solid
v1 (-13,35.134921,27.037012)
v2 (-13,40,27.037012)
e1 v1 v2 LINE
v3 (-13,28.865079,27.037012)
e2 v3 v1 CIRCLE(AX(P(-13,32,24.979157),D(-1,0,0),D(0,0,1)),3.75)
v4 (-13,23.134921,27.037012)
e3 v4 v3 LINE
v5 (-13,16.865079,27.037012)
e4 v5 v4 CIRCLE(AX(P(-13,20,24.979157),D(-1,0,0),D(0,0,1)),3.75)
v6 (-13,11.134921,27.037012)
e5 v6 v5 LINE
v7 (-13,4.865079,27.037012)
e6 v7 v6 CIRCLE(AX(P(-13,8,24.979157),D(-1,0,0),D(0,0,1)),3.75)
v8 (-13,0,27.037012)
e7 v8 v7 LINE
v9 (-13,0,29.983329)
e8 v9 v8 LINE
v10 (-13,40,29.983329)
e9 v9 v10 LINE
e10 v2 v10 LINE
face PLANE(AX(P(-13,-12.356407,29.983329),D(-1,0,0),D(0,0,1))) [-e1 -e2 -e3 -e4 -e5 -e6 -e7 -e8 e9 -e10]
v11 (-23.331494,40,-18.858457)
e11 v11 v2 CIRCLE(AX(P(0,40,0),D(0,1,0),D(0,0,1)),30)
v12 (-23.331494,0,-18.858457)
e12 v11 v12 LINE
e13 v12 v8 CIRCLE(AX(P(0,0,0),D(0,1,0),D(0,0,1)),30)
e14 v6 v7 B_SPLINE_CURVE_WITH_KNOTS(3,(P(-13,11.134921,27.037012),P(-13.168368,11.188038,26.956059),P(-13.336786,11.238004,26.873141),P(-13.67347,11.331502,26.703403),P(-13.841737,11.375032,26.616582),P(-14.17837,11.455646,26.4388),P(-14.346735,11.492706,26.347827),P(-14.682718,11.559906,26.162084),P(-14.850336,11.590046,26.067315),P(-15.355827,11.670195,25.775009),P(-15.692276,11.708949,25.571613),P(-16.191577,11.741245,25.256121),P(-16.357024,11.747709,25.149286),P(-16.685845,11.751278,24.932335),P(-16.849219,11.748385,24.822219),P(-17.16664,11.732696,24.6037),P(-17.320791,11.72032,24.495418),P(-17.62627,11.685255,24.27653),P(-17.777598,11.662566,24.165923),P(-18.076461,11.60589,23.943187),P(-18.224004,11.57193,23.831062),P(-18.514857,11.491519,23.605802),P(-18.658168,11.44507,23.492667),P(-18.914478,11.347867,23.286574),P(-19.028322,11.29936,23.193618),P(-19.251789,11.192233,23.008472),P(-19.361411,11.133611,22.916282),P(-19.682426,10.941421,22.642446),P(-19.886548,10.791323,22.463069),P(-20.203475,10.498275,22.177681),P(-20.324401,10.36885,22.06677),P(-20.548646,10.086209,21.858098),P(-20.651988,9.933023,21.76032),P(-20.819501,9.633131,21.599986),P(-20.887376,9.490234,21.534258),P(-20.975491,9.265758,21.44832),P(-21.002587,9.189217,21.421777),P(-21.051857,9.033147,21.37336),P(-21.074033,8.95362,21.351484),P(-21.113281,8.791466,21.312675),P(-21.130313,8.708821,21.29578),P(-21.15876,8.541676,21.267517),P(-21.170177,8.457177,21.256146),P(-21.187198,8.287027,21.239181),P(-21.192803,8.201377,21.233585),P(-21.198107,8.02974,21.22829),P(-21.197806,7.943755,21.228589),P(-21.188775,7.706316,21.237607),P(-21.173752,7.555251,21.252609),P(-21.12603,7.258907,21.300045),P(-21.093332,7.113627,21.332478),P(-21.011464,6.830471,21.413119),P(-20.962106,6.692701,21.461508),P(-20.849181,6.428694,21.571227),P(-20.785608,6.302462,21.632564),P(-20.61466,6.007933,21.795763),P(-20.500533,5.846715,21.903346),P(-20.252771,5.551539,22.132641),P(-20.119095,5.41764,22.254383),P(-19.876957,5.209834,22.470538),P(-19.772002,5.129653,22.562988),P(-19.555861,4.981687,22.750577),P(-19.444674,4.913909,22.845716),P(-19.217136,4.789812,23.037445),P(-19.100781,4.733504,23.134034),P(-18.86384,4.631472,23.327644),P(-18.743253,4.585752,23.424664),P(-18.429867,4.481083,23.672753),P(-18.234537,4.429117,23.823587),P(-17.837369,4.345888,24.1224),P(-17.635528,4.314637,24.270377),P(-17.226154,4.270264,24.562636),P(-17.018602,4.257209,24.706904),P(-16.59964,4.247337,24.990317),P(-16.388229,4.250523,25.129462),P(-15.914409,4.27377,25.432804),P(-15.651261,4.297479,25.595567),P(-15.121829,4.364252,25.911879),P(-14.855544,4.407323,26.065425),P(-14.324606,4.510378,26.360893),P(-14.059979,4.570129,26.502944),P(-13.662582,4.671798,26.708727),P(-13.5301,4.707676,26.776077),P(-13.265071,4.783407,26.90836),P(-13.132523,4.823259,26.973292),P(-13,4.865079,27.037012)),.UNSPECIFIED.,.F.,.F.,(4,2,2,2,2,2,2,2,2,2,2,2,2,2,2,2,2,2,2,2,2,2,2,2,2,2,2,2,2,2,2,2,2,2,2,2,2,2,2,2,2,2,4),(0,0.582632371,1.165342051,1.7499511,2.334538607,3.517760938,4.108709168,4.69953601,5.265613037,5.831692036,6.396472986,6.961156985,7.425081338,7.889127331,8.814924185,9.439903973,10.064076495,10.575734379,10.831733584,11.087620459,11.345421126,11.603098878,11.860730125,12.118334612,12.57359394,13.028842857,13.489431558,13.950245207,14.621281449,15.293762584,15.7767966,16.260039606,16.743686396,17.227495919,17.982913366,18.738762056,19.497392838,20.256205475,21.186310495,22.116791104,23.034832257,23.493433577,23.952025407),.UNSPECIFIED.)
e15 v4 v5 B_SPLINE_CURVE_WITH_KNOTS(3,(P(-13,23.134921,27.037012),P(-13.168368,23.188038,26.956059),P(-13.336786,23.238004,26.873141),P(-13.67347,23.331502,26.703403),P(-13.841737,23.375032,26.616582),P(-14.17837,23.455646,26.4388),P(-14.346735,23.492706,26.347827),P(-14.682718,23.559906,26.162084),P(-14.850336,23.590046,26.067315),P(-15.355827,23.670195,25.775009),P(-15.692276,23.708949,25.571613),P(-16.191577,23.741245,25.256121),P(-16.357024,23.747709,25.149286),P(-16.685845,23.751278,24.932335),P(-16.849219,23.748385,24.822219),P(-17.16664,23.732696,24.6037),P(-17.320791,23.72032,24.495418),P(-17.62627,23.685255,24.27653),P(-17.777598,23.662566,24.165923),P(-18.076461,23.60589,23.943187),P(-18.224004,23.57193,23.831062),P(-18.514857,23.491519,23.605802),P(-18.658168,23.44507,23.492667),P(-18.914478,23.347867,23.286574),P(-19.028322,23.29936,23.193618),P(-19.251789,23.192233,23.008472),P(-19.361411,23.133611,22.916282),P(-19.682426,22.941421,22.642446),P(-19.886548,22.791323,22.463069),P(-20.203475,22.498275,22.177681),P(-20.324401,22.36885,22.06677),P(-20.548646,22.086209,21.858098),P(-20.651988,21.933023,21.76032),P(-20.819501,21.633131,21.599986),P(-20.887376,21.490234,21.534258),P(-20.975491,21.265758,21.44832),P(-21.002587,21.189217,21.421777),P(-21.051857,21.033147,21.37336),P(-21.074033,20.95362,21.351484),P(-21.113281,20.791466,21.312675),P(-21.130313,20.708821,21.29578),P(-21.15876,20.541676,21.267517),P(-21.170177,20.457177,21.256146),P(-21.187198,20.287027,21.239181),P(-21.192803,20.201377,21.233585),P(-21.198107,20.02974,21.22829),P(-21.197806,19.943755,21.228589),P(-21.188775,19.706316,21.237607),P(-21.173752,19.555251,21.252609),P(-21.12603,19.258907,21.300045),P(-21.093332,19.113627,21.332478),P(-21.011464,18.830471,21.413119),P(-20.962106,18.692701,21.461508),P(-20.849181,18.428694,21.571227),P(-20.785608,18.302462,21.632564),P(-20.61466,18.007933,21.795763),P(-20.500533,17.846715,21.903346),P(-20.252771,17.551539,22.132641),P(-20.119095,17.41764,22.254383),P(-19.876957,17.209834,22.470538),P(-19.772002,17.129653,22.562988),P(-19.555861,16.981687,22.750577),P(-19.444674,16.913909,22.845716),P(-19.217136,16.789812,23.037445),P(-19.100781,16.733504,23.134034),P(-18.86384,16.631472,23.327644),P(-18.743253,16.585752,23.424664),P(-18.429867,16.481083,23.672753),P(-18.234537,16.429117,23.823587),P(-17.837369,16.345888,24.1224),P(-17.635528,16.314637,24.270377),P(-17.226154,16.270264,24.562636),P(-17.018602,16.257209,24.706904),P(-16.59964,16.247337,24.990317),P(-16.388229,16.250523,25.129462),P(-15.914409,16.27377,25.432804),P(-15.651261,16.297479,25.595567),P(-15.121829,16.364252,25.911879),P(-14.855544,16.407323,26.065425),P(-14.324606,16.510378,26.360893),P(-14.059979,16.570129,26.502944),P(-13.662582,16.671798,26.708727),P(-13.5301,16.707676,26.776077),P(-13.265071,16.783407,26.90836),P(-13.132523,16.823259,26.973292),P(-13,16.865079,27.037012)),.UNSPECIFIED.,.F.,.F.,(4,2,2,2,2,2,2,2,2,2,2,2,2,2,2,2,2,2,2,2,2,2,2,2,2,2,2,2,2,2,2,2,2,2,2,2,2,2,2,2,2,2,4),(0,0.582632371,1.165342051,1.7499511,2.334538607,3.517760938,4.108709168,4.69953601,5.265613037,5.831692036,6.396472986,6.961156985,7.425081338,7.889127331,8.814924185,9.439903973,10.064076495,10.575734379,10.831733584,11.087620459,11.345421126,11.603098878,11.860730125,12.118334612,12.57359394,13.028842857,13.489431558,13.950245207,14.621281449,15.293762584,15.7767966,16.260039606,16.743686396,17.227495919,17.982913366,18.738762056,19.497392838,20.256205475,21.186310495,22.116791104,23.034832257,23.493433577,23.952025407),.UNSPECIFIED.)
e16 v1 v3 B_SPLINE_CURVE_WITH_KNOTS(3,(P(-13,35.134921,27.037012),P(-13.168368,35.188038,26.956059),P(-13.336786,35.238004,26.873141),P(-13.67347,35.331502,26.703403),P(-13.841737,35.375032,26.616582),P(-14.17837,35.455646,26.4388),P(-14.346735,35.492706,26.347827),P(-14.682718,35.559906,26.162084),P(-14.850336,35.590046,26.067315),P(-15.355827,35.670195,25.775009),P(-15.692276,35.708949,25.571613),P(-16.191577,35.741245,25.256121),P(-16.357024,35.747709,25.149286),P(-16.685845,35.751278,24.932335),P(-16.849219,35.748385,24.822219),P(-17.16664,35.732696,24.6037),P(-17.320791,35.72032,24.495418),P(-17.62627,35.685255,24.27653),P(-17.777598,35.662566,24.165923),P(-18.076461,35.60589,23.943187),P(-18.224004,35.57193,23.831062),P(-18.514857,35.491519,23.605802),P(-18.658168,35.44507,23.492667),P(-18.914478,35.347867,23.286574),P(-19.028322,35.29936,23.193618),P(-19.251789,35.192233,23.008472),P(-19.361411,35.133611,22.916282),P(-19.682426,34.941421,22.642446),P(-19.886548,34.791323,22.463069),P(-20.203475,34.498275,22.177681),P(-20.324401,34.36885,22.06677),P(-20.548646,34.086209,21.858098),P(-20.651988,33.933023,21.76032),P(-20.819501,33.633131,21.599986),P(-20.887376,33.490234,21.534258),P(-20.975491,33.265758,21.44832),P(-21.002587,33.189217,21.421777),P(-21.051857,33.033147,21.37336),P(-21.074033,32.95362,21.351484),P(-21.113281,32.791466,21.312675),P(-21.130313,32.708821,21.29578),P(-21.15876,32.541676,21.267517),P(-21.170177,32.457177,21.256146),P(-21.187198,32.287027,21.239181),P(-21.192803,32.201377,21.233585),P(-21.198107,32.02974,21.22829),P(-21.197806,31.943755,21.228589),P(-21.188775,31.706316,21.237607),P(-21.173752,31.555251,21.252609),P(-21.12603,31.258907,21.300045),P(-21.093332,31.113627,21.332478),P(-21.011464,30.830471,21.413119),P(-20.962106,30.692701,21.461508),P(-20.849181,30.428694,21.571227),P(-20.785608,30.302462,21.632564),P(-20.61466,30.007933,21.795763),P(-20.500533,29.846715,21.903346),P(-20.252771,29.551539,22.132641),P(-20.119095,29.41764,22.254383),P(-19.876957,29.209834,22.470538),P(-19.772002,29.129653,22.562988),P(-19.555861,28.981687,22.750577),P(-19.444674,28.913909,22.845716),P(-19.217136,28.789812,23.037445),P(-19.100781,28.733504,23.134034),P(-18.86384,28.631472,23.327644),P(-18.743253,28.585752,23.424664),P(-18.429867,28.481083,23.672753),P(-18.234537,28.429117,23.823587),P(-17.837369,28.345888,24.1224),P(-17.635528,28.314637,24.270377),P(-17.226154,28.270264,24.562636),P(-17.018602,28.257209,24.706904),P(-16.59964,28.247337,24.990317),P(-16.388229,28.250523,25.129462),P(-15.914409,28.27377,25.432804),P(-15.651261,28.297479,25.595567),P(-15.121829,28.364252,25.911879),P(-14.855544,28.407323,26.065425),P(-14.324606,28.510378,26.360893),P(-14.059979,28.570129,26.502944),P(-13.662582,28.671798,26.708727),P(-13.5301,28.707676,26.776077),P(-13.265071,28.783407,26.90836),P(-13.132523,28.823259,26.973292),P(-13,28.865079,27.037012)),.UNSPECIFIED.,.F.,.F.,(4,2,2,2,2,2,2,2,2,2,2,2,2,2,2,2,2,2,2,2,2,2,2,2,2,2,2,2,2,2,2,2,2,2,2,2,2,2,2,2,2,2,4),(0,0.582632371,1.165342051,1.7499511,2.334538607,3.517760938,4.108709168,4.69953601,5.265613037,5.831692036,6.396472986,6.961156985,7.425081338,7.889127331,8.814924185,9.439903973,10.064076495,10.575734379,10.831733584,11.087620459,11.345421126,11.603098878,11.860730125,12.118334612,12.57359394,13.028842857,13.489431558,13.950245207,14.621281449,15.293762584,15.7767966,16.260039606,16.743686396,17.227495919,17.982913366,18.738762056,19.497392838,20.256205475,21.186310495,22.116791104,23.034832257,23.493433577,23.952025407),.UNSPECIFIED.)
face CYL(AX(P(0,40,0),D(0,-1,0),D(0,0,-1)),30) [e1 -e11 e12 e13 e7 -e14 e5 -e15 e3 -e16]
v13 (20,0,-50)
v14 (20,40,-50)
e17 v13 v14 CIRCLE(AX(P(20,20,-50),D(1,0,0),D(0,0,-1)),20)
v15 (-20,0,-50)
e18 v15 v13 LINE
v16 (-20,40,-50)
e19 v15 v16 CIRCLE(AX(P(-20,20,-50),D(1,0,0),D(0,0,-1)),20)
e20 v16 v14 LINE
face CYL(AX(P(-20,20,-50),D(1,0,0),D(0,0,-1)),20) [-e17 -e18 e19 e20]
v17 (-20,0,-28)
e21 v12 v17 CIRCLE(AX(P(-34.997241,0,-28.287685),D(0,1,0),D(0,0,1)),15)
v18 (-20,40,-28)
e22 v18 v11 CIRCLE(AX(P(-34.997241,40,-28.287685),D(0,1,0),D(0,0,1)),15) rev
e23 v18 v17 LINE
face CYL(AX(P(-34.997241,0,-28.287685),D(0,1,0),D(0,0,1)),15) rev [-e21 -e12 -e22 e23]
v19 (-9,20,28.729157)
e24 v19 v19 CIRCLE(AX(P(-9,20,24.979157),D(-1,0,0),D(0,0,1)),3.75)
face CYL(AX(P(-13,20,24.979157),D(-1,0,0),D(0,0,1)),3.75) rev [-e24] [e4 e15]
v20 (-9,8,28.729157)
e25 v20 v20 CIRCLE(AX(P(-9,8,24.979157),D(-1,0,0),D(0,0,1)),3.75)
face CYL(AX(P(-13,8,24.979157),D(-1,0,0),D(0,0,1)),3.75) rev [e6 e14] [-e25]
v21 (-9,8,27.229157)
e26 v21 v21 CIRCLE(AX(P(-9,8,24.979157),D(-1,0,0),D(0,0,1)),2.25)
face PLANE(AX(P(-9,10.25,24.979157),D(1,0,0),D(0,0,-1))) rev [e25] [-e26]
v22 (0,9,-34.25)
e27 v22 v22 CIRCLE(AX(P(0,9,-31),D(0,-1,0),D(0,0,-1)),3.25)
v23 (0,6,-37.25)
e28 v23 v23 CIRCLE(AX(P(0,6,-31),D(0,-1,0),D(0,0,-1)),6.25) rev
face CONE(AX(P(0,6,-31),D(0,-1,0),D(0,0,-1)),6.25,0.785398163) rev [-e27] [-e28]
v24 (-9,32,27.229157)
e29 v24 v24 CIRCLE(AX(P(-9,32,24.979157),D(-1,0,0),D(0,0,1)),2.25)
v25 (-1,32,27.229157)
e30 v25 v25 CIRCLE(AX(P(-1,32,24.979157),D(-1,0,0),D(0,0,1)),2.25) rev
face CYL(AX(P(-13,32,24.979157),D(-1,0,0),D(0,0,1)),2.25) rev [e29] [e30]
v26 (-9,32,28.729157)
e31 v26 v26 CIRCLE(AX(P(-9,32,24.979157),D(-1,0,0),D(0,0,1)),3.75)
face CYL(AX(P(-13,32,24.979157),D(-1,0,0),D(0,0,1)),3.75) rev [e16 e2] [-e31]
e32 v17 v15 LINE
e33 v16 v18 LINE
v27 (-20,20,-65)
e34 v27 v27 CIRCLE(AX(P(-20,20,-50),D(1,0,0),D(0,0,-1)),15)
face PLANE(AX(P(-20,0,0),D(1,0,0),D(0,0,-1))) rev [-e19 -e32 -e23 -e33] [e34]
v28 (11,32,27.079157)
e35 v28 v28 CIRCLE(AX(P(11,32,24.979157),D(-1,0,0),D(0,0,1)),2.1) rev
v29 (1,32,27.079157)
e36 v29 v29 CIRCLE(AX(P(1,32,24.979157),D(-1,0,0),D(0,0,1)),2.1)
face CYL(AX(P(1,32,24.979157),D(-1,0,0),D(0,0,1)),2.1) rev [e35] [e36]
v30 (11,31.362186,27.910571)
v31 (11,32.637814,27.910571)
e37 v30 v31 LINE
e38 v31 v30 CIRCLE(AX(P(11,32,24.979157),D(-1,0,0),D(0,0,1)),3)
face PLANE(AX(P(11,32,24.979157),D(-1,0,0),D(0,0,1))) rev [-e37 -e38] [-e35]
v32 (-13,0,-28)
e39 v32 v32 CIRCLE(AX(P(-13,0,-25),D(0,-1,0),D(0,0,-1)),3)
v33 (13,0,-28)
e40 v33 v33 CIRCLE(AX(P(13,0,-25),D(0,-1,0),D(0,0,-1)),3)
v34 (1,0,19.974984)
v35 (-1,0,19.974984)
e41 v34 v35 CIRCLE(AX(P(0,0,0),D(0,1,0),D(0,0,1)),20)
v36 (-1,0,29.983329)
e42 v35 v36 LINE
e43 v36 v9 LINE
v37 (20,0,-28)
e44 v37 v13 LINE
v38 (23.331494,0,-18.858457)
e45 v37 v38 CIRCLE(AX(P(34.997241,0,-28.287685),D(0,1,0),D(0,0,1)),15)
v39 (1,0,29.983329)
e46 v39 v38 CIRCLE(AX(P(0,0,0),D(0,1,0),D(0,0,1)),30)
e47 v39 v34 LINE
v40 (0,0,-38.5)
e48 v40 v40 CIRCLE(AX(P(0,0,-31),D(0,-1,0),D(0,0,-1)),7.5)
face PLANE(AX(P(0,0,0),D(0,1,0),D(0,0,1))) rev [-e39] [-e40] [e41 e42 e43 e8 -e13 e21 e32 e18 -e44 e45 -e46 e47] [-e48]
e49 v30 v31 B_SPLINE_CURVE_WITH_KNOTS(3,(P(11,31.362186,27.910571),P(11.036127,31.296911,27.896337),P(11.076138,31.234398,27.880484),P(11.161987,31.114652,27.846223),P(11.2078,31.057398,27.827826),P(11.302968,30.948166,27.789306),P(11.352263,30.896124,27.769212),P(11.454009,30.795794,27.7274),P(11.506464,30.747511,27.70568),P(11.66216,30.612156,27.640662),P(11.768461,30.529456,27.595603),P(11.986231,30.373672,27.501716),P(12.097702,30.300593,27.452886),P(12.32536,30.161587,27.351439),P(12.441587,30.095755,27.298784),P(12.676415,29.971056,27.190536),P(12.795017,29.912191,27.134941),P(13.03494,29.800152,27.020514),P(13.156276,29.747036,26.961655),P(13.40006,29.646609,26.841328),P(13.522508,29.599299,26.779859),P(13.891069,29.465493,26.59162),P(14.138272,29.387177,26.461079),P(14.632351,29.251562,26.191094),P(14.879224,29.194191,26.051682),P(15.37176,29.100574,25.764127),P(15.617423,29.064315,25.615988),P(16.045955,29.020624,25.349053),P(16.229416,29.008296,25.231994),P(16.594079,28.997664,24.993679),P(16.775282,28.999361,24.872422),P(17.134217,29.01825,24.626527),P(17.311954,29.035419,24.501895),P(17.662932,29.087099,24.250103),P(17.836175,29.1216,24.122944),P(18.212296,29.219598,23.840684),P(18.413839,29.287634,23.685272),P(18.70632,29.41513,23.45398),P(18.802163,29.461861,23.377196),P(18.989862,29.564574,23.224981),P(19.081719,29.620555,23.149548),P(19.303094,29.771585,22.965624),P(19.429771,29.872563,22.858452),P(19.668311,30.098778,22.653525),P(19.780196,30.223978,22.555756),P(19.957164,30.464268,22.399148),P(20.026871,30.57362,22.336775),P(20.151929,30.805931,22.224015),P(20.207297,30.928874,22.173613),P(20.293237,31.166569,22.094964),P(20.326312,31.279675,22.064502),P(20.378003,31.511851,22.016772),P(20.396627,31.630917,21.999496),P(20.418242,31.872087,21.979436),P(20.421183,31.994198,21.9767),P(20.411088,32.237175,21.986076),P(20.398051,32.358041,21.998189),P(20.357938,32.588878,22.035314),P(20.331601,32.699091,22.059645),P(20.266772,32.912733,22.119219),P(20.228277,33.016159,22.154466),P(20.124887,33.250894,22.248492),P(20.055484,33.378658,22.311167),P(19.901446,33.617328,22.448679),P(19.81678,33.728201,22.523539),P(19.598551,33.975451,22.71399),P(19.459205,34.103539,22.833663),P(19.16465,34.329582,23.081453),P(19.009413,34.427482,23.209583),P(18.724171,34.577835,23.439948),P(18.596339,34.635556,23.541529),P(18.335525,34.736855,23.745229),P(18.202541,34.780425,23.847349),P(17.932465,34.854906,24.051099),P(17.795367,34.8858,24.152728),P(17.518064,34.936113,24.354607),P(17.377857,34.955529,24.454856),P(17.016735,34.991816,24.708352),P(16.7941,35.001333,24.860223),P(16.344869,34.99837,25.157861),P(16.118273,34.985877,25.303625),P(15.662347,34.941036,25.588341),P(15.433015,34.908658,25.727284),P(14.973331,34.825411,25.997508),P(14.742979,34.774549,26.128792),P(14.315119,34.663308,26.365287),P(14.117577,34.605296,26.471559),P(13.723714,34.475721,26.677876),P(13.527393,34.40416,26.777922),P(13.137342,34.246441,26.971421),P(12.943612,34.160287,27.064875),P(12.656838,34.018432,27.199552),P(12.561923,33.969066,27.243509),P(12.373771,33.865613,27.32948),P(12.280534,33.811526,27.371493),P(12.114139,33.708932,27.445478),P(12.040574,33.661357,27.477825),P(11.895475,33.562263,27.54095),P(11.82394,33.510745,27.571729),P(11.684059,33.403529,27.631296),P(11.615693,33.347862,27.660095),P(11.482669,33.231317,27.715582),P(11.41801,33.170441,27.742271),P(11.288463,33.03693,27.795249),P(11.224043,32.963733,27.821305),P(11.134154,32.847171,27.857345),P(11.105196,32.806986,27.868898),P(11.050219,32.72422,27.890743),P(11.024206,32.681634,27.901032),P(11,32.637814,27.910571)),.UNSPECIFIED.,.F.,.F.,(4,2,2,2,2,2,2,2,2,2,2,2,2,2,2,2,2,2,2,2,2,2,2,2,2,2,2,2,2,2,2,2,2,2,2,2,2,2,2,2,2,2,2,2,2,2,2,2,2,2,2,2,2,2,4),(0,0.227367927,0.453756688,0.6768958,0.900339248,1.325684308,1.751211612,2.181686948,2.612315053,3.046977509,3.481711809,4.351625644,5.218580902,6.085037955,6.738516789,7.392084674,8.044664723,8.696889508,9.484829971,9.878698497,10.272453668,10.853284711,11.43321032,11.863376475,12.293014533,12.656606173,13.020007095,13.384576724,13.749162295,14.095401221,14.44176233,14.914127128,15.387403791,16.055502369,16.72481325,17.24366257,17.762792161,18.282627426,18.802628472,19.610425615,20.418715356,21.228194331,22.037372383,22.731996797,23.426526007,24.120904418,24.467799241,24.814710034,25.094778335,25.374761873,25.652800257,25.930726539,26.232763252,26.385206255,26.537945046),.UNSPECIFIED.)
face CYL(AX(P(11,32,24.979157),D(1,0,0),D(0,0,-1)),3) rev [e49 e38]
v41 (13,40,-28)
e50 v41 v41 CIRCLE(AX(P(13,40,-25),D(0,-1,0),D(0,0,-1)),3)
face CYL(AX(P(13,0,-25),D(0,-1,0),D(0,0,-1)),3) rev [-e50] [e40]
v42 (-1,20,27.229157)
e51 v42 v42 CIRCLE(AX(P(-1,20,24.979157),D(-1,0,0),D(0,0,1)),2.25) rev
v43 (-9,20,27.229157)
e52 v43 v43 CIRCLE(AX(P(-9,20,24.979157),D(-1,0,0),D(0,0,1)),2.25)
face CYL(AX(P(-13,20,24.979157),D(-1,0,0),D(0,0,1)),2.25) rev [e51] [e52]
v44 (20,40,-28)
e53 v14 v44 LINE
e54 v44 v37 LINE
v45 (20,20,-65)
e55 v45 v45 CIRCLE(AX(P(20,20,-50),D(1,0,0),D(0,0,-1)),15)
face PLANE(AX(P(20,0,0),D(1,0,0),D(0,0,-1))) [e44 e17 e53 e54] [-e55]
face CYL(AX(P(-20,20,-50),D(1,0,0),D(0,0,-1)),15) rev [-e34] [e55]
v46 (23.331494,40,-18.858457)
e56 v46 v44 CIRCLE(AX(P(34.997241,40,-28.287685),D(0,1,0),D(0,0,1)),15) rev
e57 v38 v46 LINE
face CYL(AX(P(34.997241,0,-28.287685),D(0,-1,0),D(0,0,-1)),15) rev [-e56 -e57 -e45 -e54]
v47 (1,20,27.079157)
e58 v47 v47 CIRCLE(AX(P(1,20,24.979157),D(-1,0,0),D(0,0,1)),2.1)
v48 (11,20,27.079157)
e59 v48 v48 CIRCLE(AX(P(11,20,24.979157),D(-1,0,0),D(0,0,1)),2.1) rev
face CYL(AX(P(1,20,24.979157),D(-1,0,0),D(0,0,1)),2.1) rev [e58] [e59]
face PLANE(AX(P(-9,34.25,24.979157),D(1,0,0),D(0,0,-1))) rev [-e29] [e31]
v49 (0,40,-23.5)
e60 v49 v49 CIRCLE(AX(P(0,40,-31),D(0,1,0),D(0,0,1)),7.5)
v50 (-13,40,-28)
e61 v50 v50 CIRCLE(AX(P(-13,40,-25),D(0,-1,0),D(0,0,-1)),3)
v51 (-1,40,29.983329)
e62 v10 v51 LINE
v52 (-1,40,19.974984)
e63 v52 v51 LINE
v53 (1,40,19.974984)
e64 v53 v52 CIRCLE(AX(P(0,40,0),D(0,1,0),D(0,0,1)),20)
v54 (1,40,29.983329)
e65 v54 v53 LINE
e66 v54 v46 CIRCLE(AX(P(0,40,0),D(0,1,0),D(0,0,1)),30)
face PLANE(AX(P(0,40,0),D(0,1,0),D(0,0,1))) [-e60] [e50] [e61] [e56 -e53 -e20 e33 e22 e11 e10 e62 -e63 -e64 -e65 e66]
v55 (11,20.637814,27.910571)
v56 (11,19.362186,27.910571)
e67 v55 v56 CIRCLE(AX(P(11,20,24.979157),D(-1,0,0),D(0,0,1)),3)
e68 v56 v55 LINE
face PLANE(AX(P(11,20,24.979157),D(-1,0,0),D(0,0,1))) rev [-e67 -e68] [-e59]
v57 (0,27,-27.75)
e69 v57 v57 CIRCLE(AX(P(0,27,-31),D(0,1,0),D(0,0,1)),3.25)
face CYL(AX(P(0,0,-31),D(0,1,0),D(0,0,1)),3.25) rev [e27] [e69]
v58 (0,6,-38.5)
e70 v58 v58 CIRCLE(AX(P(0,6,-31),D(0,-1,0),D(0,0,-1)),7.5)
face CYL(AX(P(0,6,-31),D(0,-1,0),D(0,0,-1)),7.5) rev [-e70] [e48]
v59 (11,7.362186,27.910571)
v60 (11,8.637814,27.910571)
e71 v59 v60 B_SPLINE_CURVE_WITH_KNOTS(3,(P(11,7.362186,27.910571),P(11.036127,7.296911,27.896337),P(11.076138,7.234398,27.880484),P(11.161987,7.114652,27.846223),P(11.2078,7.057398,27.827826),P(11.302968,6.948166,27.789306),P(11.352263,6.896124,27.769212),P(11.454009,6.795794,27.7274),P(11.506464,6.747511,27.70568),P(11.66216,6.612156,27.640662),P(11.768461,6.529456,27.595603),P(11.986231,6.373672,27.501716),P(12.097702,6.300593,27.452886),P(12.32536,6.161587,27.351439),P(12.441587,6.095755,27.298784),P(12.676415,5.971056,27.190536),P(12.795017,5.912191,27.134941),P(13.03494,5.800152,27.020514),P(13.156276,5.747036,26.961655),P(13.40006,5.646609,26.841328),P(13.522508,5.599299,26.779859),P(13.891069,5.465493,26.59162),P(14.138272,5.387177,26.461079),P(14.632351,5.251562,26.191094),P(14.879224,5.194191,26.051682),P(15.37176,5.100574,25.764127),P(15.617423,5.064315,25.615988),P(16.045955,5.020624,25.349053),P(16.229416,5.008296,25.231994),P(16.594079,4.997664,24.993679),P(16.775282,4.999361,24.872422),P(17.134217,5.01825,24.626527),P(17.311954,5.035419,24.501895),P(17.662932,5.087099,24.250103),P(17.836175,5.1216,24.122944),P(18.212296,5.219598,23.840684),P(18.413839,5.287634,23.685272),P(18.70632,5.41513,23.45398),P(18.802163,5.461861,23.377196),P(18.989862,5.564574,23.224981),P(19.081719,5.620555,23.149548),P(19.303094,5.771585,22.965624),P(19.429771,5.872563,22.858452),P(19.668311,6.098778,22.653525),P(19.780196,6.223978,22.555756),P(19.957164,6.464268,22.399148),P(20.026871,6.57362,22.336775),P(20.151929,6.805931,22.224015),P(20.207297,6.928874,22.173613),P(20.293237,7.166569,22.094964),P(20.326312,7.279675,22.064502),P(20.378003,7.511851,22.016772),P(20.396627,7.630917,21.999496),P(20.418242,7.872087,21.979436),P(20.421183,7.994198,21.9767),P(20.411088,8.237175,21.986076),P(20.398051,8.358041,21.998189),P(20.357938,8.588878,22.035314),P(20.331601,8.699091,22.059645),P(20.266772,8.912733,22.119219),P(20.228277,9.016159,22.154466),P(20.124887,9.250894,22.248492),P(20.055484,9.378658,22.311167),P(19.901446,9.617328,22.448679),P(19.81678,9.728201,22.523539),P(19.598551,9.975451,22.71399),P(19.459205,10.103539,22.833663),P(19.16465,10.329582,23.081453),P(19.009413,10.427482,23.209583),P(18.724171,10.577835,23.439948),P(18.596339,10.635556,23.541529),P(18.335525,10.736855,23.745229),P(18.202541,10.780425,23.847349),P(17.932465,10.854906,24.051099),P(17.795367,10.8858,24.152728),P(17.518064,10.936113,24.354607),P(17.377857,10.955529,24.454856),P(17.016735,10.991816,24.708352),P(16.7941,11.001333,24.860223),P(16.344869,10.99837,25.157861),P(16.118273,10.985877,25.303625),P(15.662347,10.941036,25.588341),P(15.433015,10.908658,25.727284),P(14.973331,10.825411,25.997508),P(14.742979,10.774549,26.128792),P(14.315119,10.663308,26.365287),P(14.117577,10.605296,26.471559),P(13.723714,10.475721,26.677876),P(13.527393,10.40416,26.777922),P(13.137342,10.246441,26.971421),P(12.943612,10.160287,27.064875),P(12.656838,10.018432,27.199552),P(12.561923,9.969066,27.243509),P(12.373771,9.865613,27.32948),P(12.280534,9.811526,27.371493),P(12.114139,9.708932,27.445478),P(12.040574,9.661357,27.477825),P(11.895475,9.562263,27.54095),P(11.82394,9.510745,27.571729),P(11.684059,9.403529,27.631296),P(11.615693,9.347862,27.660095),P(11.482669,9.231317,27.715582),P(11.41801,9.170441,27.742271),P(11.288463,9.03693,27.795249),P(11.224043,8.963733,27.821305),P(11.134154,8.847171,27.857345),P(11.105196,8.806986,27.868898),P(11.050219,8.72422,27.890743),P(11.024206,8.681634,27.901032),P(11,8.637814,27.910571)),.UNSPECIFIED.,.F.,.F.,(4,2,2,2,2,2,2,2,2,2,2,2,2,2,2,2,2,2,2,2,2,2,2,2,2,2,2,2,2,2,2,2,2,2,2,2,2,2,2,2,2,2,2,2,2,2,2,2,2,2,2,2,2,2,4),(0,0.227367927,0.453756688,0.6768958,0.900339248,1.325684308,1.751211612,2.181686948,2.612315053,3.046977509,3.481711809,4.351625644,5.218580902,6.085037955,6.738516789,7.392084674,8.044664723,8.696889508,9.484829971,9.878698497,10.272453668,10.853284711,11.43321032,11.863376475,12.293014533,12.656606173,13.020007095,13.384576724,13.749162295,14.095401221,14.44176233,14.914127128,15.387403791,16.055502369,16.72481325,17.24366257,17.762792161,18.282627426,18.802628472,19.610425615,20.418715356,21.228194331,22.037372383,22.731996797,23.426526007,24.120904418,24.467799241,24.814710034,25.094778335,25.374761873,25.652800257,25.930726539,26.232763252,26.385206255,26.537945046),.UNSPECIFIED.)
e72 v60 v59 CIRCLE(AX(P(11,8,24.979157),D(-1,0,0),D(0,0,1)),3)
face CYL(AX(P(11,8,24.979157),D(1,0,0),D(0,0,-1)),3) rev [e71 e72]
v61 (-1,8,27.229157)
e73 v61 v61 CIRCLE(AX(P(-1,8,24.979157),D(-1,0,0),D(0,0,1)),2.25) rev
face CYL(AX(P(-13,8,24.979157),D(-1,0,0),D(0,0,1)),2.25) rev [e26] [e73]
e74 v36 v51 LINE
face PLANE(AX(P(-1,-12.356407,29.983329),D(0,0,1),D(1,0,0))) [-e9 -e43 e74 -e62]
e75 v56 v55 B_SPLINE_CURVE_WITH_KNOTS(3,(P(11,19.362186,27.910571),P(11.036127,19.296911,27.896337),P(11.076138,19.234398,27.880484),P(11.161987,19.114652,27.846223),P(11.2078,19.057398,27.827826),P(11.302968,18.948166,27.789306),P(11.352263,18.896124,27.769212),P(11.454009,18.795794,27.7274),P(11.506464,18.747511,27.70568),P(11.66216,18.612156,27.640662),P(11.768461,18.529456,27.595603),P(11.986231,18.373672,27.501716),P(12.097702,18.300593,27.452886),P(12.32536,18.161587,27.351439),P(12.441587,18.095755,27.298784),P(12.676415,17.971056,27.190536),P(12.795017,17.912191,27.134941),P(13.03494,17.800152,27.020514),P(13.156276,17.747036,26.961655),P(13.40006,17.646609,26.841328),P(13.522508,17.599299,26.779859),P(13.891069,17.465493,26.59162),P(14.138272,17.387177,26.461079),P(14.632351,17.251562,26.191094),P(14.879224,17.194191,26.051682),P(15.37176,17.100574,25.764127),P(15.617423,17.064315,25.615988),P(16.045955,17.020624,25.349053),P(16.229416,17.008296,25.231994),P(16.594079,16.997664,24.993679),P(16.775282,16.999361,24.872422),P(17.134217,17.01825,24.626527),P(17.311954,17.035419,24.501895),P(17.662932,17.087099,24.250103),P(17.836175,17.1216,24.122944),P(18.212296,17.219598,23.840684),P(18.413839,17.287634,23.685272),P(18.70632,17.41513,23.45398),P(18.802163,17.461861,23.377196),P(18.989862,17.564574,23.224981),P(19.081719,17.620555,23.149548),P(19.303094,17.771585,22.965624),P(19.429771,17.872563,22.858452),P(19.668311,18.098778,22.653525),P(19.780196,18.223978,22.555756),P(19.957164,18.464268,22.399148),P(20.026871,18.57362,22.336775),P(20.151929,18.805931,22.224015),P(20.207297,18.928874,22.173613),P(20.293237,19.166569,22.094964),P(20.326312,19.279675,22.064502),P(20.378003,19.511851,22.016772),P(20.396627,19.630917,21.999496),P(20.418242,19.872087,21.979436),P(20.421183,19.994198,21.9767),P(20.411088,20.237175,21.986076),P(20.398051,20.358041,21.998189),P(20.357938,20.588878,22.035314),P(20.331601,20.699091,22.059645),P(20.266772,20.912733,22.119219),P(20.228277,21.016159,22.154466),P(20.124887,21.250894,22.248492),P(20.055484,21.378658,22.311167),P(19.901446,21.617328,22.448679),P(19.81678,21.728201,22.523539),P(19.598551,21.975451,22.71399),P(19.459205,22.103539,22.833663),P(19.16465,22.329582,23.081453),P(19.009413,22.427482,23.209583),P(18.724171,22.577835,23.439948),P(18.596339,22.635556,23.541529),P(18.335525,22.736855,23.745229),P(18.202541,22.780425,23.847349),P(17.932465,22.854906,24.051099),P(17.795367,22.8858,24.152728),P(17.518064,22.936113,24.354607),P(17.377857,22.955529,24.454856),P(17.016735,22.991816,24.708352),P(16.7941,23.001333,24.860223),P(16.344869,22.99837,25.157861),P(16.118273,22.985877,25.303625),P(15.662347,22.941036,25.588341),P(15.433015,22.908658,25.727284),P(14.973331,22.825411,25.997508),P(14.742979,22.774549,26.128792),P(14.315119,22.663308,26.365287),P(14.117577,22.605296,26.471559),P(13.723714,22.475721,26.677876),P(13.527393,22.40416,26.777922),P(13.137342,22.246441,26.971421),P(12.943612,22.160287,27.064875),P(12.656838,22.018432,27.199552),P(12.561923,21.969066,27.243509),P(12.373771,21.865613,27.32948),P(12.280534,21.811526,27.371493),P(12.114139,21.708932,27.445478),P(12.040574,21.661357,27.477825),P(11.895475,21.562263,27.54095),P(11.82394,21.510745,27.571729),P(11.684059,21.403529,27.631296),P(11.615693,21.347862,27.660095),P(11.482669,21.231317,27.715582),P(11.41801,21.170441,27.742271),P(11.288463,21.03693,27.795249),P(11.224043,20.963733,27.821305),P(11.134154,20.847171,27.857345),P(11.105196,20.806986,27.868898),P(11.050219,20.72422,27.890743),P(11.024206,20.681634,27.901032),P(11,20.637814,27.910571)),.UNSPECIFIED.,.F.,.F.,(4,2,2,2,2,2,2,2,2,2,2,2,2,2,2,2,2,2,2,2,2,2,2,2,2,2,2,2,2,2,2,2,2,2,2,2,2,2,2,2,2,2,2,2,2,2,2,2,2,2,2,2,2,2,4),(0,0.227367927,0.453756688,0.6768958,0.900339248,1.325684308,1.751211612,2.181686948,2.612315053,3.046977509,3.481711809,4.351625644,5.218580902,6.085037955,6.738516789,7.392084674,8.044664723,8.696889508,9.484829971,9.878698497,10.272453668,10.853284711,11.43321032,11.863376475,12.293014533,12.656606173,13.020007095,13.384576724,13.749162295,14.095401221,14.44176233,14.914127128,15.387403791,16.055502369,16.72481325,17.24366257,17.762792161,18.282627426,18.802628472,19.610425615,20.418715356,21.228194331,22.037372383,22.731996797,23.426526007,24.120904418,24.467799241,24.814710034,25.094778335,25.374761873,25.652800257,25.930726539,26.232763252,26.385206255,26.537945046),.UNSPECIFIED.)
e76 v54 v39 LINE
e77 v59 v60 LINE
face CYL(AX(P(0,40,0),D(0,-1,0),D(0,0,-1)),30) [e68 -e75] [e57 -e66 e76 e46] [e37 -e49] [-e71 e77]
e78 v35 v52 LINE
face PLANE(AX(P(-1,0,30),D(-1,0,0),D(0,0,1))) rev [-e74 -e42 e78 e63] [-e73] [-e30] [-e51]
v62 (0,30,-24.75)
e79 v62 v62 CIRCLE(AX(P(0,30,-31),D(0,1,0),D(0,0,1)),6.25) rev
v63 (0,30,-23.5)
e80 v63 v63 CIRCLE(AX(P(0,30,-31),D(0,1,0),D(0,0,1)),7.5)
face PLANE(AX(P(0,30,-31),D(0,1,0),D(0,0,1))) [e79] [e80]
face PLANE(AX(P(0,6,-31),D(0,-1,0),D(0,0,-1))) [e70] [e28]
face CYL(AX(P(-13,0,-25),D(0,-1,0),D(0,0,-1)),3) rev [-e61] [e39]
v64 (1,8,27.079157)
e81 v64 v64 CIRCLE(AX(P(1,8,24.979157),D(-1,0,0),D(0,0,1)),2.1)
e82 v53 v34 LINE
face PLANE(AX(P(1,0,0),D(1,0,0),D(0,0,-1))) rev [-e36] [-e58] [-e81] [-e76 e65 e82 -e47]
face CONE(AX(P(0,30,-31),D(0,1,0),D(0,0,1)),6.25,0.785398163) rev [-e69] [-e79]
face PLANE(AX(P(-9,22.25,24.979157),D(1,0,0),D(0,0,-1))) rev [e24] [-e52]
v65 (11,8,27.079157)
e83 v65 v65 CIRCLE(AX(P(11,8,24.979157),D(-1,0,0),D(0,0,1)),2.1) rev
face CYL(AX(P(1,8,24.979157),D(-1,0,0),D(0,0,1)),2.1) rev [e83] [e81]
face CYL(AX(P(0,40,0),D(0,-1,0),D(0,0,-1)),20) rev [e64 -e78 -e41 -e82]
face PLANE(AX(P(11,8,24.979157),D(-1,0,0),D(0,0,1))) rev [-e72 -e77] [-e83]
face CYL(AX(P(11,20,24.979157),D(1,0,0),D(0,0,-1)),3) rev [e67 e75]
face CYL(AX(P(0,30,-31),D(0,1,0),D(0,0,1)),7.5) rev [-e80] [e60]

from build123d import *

# Parameters (mm, degrees)
SKETCH1_R                                    = 30
SKETCH1_R_2                                  = 20
BOSS_EXTRUDE1_DEPTH                          = 40
SKETCH2_W                                    = 2
SKETCH2_H                                    = 30
CUT_EXTRUDE1_DEPTH                           = 59.309518948
BOSS_EXTRUDE2_START                          = -40
BOSS_EXTRUDE2_DEPTH                          = 40
CBORE_FOR_M4_HEX_SOCKET_HEAD_CAP_SCR_2_COUNT = 2
CBORE_FOR_M4_HEX_SOCKET_HEAD_CAP_SCR_2_PITCH = 12
CBORE_FOR_M4_HEX_SOCKET_HEAD_CAP_SCR_3_COUNT = 2
CBORE_FOR_M4_HEX_SOCKET_HEAD_CAP_SCR_3_PITCH = 24
SKETCH6_R                                    = 3.75
CUT_EXTRUDE2_DEPTH                           = 66.946948375
F_5_4_5_4_DIAMETER_HOLE1_D                   = 4.2
SKETCH10_R                                   = 3
CUT_EXTRUDE3_DEPTH                           = 11
BOSS_EXTRUDE4_START                          = -20
BOSS_EXTRUDE4_OUTLINE_R                      = 15
BOSS_EXTRUDE4_DEPTH                          = 40
FILLET1_R                                    = 15
SKETCH22_R                                   = 3.25
CUT_EXTRUDE4_DEPTH                           = 87.023252752
SKETCH23_R                                   = 7.5
CUT_EXTRUDE5_DEPTH                           = 10
CHAMFER1_SIZE                                = 3
CUT_EXTRUDE6_START                           = -6
SKETCH24_R                                   = 7.5
CUT_EXTRUDE6_DEPTH                           = 6
CHAMFER2_SIZE                                = 3
F_6_0MM_DOWEL_HOLE1_D                        = 6


# Read off the part's stored shape, not the designer's step: Boss-Extrude4
with BuildPart() as part:
    # Sketch1 → Boss-Extrude1 (new body)
    with BuildSketch(Plane(origin=(0, 0, 0), x_dir=(1, 0, 0), z_dir=(0, 1, 0))):
        with Locations(Location((0, 0, 0), (0, 0, 270))):
            Circle(SKETCH1_R)
        with Locations(Location((0, 0, 0), (0, 0, 270))):
            Circle(SKETCH1_R_2, mode=Mode.SUBTRACT)
    extrude(amount=BOSS_EXTRUDE1_DEPTH)

    # Sketch2 → Cut-Extrude1 (cut, through all)
    with BuildSketch(Plane(origin=(0, 40, 0), x_dir=(1, 0, 0), z_dir=(0, 1, 0))):
        with Locations((0, -15)):
            Rectangle(SKETCH2_W, SKETCH2_H)
    extrude(amount=-CUT_EXTRUDE1_DEPTH, mode=Mode.SUBTRACT)

    # Sketch3 → Boss-Extrude2 (add)
    with BuildSketch(Plane(origin=(0, 40, 0), x_dir=(1, 0, 0), z_dir=(0, 1, 0)).offset(BOSS_EXTRUDE2_START)):
        with BuildLine():
            Line((-1, -29.983328701), (-13, -29.983328701))
            Line((-13, -29.983328701), (-13, -27.037011669))
            ThreePointArc((-13, -27.037011669), (-7.153334608, -29.134683866), (-1, -29.983328701))
        make_face()
    extrude(amount=BOSS_EXTRUDE2_DEPTH)

    # Sketch5 → CBORE for M4 Hex Socket Head Cap Screw1 (revolve, cut)
    with BuildSketch(Plane(origin=(-13, 32, 24.979156528), x_dir=(0, 0, 1), z_dir=(0, 1, 0))):
        Polygon((0, 0), (0, 13.351936393), (2.25, 12), (2.25, 4), (3.75, 4), (3.75, 0), align=None)
    cbore_for_m4_hex_socket_head_cap_screw1 = revolve(axis=Axis((-19.35, 32, 24.979156528), (1, 0, 0)), mode=Mode.SUBTRACT)

    # CBORE for M4 Hex Socket Head Cap Scr 2: CBORE for M4 Hex Socket Head Cap Screw1 ×2
    with Locations(*[(0, -i * CBORE_FOR_M4_HEX_SOCKET_HEAD_CAP_SCR_2_PITCH, 0) for i in range(1, CBORE_FOR_M4_HEX_SOCKET_HEAD_CAP_SCR_2_COUNT)]):
        add(cbore_for_m4_hex_socket_head_cap_screw1, mode=Mode.SUBTRACT)

    # CBORE for M4 Hex Socket Head Cap Scr 3: CBORE for M4 Hex Socket Head Cap Screw1 ×2
    with Locations(*[(0, -i * CBORE_FOR_M4_HEX_SOCKET_HEAD_CAP_SCR_3_PITCH, 0) for i in range(1, CBORE_FOR_M4_HEX_SOCKET_HEAD_CAP_SCR_3_COUNT)]):
        add(cbore_for_m4_hex_socket_head_cap_screw1, mode=Mode.SUBTRACT)

    # Sketch6 → Cut-Extrude2 (cut, through all)
    with BuildSketch(Plane.ZY.offset(13)):
        with Locations((24.979156528, 32)):
            Circle(SKETCH6_R)
        with Locations((24.979156528, 20)):
            Circle(SKETCH6_R)
        with Locations((24.979156528, 8)):
            Circle(SKETCH6_R)
    extrude(amount=CUT_EXTRUDE2_DEPTH, mode=Mode.SUBTRACT)

    # Ø5.4 (5.4) Diameter Hole1 (through all)
    with Locations(Plane.ZY.offset(-1)):
        with Locations((24.979156528, 8), (24.979156528, 20), (24.979156528, 32)):
            Hole(F_5_4_5_4_DIAMETER_HOLE1_D / 2)

    # Sketch10 → Cut-Extrude3 (cut)
    with BuildSketch(Plane.ZY.offset(-22)):
        with Locations((24.979156528, 8)):
            Circle(SKETCH10_R)
        with Locations((24.979156528, 32)):
            Circle(SKETCH10_R)
        with Locations((24.979156528, 20)):
            Circle(SKETCH10_R)
    extrude(amount=CUT_EXTRUDE3_DEPTH, mode=Mode.SUBTRACT)

    # Boss-Extrude4 outline → Boss-Extrude4 (add)
    with BuildSketch(Plane(origin=(0, 0, 0), x_dir=(0, 0, -1), z_dir=(1, 0, 0)).offset(BOSS_EXTRUDE4_START)):
        with BuildLine():
            ThreePointArc((50, 0), (70, 20), (50, 40))
            Line((50, 40), (28, 40))
            Line((28, 40), (28, 0))
            Line((28, 0), (50, 0))
        make_face()
        with Locations((50, 20)):
            Circle(BOSS_EXTRUDE4_OUTLINE_R, mode=Mode.SUBTRACT)
    extrude(amount=BOSS_EXTRUDE4_DEPTH)

    # Fillet1
    # the kernel refuses this fillet: 15 mm, written as the material it adds along each edge
    with BuildSketch(Plane(origin=(10.770329614, 40, -28), x_dir=(0.8085477056225361, 0, 0.5884306311983875), z_dir=(0, -1, 0))) as fillet1_piece_1:
        with BuildLine():
            CenterArc((19.419330938, -14.488463805), FILLET1_R, 105.006250165, 37.84908673)
            Line((7.462628814, -5.431020771), (0, 0))
            ThreePointArc((0, 0), (7.767732375, -1.023072389), (15.53546475, 0))
        make_face()
    extrude(amount=40)
    with BuildSketch(Plane(origin=(-10.770329614, 40, -28), x_dir=(-0.8085477056225359, 0, 0.5884306311983878), z_dir=(0, -1, 0))) as fillet1_piece_2:
        with BuildLine():
            CenterArc((19.419330938, 14.488463805), FILLET1_R, 217.144663105, 37.84908673)
            Line((7.462628814, 5.431020771), (0, 0))
            ThreePointArc((0, 0), (7.767732375, 1.023072389), (15.53546475, 0))
        make_face()
    extrude(amount=40)

    # Sketch22 → Cut-Extrude4 (cut, through all)
    with BuildSketch(Plane(origin=(0, 40, 0), x_dir=(1, 0, 0), z_dir=(0, 1, 0))):
        with Locations(Location((0, 31, 0), (0, 0, 270))):
            Circle(SKETCH22_R)
    extrude(amount=-CUT_EXTRUDE4_DEPTH, mode=Mode.SUBTRACT)

    # Sketch23 → Cut-Extrude5 (cut)
    with BuildSketch(Plane(origin=(0, 40, 0), x_dir=(1, 0, 0), z_dir=(0, 1, 0))):
        with Locations(Location((0, 31, 0), (0, 0, 270))):
            Circle(SKETCH23_R)
    extrude(amount=-CUT_EXTRUDE5_DEPTH, mode=Mode.SUBTRACT)

    # Chamfer1
    chamfer1_edges = [part.edges().sort_by_distance(p)[0] for p in [
        (0, 30, -34.25),
    ]]
    chamfer(chamfer1_edges, length=CHAMFER1_SIZE)

    # Sketch24 → Cut-Extrude6 (cut)
    with BuildSketch(Plane.XZ.offset(CUT_EXTRUDE6_START)):
        with Locations(Location((0, -31, 0), (0, 0, 90))):
            Circle(SKETCH24_R)
    extrude(amount=CUT_EXTRUDE6_DEPTH, mode=Mode.SUBTRACT)

    # Chamfer2
    chamfer2_edges = [part.edges().sort_by_distance(p)[0] for p in [
        (0, 6, -34.25),
    ]]
    chamfer(chamfer2_edges, length=CHAMFER2_SIZE)

    # Ø6.0mm Dowel Hole1 (through all)
    with Locations(Plane(origin=(0, 0, 0), x_dir=(-1, 0, 0), z_dir=(0, -1, 0))):
        with Locations((13, 25), (-13, 25)):
            Hole(F_6_0MM_DOWEL_HOLE1_D / 2)


solid = part.part
